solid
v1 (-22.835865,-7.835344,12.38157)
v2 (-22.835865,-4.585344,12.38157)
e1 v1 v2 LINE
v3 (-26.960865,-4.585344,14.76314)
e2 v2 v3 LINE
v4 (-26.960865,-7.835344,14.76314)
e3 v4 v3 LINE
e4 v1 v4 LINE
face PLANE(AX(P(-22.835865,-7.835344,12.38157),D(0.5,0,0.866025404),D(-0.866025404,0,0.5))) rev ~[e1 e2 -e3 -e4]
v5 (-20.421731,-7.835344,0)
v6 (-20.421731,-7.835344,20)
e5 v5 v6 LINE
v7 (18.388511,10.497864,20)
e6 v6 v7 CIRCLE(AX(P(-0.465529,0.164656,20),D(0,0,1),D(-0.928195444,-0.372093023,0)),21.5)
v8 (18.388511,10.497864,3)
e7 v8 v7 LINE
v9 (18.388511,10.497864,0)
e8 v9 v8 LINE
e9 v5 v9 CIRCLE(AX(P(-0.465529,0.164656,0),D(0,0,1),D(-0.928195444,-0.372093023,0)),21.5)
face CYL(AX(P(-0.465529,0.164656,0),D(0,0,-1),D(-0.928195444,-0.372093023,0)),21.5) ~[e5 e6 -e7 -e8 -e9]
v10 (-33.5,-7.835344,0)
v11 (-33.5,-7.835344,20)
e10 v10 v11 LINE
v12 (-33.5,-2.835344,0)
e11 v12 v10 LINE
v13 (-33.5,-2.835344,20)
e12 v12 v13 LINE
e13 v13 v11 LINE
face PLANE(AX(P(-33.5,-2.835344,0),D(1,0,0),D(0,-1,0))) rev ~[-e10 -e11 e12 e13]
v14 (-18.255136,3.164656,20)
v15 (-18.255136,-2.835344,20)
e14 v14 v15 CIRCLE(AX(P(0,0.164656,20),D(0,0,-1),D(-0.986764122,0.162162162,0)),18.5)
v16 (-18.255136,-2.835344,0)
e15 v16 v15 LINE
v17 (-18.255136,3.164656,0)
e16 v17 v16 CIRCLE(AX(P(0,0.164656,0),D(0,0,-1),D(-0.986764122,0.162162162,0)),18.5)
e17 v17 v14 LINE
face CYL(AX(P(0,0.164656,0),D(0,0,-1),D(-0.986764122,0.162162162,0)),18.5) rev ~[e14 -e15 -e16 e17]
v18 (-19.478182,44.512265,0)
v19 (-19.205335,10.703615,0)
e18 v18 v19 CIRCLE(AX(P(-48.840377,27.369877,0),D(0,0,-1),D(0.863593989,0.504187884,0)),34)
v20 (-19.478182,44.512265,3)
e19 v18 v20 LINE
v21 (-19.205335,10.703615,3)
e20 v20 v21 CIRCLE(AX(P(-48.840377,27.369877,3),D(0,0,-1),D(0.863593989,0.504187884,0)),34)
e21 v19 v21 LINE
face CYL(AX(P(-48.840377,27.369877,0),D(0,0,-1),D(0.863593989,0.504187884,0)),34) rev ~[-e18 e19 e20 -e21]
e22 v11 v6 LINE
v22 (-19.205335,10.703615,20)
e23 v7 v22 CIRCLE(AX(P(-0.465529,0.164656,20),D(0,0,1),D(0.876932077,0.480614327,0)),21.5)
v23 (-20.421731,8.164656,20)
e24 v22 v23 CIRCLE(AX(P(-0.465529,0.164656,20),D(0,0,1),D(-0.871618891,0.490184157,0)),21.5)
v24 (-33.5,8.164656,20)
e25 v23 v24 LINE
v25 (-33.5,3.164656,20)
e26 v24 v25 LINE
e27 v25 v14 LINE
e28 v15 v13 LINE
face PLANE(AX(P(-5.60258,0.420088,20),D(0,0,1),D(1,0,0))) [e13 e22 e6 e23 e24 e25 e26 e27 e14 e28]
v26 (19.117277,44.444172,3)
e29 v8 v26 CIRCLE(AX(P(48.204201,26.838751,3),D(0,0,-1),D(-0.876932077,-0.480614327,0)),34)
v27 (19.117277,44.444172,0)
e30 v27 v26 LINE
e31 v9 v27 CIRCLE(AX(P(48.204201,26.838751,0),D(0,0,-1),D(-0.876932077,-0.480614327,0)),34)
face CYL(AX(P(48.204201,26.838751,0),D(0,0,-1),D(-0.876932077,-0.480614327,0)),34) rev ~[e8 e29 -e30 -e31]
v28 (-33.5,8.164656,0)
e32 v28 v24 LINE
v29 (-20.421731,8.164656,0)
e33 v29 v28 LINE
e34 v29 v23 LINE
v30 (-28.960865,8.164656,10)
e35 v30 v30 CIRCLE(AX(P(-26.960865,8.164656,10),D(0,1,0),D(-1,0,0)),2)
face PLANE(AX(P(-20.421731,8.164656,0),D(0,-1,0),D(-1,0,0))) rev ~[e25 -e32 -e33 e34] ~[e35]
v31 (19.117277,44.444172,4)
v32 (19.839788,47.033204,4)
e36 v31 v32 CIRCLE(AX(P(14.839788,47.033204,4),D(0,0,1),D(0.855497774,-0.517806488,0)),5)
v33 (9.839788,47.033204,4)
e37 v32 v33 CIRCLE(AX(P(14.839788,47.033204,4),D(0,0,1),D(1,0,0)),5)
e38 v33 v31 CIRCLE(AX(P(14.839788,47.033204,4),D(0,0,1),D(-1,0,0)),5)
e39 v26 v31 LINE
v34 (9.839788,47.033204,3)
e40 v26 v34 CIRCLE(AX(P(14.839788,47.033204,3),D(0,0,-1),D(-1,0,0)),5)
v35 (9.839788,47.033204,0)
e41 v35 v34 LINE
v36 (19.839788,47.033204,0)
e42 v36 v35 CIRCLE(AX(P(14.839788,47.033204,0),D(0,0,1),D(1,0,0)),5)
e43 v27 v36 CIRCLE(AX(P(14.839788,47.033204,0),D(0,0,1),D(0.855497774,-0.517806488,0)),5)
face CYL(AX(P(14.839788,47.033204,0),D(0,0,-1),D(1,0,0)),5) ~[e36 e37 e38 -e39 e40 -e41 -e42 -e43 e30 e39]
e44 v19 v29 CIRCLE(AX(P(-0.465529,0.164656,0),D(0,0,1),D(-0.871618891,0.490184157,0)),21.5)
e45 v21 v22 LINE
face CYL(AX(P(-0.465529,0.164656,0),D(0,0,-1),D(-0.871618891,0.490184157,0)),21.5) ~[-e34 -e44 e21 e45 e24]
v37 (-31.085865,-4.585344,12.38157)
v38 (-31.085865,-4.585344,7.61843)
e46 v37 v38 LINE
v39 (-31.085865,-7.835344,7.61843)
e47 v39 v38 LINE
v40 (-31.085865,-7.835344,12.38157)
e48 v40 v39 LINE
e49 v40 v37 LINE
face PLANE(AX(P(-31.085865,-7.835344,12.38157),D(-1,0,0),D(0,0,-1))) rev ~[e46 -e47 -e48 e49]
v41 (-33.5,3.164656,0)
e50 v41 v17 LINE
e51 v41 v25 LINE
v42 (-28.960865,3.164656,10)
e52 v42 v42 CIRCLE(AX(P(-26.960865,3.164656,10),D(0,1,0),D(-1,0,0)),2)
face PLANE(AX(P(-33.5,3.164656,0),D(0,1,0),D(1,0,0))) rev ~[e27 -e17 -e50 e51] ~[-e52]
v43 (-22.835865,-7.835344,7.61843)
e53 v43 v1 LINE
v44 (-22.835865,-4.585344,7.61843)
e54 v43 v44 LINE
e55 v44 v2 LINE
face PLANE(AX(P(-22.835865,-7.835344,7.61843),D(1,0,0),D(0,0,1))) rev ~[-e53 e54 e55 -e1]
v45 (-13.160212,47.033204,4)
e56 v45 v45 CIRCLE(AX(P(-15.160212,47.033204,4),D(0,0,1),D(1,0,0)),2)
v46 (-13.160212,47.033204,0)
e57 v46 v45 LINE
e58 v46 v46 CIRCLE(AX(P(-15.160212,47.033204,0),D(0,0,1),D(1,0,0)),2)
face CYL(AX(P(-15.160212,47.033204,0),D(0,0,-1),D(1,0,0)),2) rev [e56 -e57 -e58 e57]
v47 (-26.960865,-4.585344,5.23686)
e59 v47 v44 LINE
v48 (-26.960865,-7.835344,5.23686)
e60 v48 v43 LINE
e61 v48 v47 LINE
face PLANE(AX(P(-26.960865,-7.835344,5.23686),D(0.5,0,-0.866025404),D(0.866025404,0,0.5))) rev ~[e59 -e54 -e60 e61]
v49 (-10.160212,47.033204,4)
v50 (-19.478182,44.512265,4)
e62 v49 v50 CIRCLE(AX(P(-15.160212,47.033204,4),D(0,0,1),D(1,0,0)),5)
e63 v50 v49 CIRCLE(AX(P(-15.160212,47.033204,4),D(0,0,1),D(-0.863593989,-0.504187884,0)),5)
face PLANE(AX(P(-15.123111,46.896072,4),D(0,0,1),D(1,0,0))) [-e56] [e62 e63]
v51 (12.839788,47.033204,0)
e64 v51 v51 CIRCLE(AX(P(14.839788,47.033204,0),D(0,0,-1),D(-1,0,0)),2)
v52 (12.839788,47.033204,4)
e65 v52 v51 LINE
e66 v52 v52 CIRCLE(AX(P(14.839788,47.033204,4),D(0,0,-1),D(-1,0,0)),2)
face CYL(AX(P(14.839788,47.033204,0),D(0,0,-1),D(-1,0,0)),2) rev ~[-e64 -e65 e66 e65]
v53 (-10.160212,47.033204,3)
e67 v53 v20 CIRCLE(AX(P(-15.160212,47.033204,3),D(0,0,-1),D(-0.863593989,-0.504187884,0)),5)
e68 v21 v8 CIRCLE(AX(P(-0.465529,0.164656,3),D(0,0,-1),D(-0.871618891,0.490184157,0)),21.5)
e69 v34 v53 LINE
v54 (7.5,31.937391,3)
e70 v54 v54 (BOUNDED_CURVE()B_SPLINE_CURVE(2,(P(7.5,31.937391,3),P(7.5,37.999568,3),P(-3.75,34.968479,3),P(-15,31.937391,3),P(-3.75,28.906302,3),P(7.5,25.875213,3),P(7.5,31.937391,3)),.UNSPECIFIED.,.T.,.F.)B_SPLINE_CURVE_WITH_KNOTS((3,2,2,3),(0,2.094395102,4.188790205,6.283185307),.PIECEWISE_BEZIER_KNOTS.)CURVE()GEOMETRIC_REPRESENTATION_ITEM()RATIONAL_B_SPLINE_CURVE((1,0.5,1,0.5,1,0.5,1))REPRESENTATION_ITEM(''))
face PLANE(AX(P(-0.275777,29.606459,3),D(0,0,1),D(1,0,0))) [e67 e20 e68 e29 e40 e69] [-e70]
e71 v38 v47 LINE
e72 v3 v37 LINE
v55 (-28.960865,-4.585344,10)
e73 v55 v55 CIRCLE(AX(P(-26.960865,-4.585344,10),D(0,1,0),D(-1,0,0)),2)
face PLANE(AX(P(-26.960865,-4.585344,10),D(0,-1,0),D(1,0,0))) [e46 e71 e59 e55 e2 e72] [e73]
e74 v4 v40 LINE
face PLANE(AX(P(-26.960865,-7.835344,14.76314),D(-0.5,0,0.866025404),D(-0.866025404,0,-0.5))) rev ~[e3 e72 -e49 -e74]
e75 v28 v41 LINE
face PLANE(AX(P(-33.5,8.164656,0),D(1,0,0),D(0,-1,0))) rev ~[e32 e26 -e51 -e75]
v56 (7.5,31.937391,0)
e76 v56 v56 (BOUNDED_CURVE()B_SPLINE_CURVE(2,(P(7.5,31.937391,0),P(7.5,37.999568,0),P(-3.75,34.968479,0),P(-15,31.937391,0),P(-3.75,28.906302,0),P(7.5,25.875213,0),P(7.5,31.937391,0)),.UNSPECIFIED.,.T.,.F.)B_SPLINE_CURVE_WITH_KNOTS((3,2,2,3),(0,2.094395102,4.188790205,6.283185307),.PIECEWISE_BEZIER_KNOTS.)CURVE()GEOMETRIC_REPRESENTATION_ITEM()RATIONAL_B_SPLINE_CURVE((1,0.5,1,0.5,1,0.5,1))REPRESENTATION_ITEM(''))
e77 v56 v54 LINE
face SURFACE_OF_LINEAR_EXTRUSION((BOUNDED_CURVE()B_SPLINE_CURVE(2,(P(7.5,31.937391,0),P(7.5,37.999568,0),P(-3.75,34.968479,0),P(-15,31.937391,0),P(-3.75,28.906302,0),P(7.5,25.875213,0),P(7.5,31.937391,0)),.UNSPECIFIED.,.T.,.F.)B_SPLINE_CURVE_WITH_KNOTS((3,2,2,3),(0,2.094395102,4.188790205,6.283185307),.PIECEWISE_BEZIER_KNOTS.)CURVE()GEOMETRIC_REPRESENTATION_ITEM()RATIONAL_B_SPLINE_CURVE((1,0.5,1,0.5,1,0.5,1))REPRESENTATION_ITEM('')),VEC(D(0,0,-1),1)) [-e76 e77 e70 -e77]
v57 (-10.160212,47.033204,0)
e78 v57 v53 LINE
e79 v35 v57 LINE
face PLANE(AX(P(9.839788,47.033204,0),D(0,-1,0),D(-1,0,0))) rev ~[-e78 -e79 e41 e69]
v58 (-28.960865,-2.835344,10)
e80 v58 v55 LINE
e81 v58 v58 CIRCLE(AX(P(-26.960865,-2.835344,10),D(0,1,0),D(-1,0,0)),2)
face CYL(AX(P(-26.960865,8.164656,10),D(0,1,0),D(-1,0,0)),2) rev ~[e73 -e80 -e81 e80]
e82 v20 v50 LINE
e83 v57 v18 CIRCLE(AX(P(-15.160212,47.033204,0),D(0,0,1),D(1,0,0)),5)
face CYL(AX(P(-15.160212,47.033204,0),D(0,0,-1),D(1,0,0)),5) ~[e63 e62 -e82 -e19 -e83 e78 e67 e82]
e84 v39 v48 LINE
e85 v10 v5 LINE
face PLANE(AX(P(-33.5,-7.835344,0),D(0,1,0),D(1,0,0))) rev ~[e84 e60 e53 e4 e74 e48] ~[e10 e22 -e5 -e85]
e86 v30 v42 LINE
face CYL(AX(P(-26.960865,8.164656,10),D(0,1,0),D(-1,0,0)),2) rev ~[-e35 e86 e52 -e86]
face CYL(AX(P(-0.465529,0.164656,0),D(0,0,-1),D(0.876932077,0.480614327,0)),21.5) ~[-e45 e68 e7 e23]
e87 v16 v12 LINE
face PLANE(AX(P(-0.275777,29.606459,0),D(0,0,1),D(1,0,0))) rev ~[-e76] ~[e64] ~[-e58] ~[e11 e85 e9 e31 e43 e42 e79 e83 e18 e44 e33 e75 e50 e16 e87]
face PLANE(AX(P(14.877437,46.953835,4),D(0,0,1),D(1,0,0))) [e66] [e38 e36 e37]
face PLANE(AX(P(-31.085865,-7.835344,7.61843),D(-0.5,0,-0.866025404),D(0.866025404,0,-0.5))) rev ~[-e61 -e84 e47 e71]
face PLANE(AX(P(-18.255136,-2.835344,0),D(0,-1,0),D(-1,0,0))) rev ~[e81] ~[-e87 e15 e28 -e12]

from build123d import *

# Parameters (mm, degrees)
F1_DEPTH = 20
F0_R     = 2
F2_DEPTH = 3
F3_DEPTH = 4
F5_DEPTH = 3.25
F6_R     = 2
F7_DEPTH = 29.5010001


# Not quite as in the source:
# - a feature names something its author has since deleted; it is built from what else it names


with BuildPart() as f1:
    # F0 (on Top) → F1 (new body)
    with BuildSketch(Plane.XY):
        with BuildLine():
            ThreePointArc((-18.2551362635, 3.1646558729), (18.5, 0.1646558729), (-18.2551362635, -2.8353441271))
            Line((-18.2551362635, -2.8353441271), (-21.289668856, -2.8353441271))
            Line((-21.289668856, -2.8353441271), (-33.5, -2.8353441271))
            Line((-33.5, -2.8353441271), (-33.5, -5.8353441271))
            Line((-33.5, -5.8353441271), (-33.5, -7.8353441271))
            Line((-33.5, -7.8353441271), (-20.4217309456, -7.8353441271))
            ThreePointArc((-20.4217309456, -7.8353441271), (8.7176252261, -19.2755005117), (18.3885107603, 10.4978639134))
            ThreePointArc((18.3885107603, 10.4978639134), (-0.3478610365, 21.6643338769), (-19.2053350681, 10.7036152553))
            ThreePointArc((-19.2053350681, 10.7036152553), (-19.8551354356, 9.4540669672), (-20.4217309456, 8.1646558729))
            Line((-20.4217309456, 8.1646558729), (-33.5, 8.1646558729))
            Line((-33.5, 8.1646558729), (-33.5, 6.1646558729))
            Line((-33.5, 6.1646558729), (-33.5, 3.1646558729))
            Line((-33.5, 3.1646558729), (-21.289668856, 3.1646558729))
            Line((-21.289668856, 3.1646558729), (-18.2551362635, 3.1646558729))
        make_face()
    extrude(amount=F1_DEPTH)

    # F0 (on Top) → F2 (join)
    with BuildSketch(Plane.XY):
        with BuildLine():
            ThreePointArc((-19.2053350681, 10.7036152553), (-0.3478610365, 21.6643338769), (18.3885107603, 10.4978639134))
            ThreePointArc((18.3885107603, 10.4978639134), (14.2120337074, 27.5685018888), (19.1172770705, 44.4441716239))
            ThreePointArc((19.1172770705, 44.4441716239), (13.4958098431, 42.2172179553), (9.8397882001, 47.0332040616))
            Line((9.8397882001, 47.0332040616), (-10.1602117999, 47.0332040616))
            ThreePointArc((-10.1602117999, 47.0332040616), (-13.8544265436, 42.2067224379), (-19.4781817457, 44.512264644))
            ThreePointArc((-19.4781817457, 44.512264644), (-14.8414845345, 27.6442586076), (-19.2053350681, 10.7036152553))
        make_face()
        with BuildLine():
            add(Edge.make_bspline(
                [(7.5, 31.9373905659), (7.5, 37.9995683924), (-3.75, 34.9684794791), (-15, 31.9373905659), (-3.75, 28.9063016526), (7.5, 25.8752127394), (7.5, 31.9373905659)],
                knots=[0, 0, 0, 2.0943951024, 2.0943951024, 4.1887902048, 4.1887902048, 6.2831853072, 6.2831853072, 6.2831853072], degree=2, weights=[1, 0.5, 1, 0.5, 1, 0.5, 1]))
        make_face(mode=Mode.SUBTRACT)
        with BuildLine():
            ThreePointArc((-10.1602117999, 47.0332040616), (-16.4659970562, 51.8596856854), (-19.4781817457, 44.512264644))
            ThreePointArc((-19.4781817457, 44.512264644), (-13.8544265436, 42.2067224379), (-10.1602117999, 47.0332040616))
        make_face()
        with Locations((-15.1602117999, 47.0332040616)):
            Circle(F0_R, mode=Mode.SUBTRACT)
        with BuildLine():
            ThreePointArc((9.8397882001, 47.0332040616), (13.4958098431, 42.2172179553), (19.1172770705, 44.4441716239))
            ThreePointArc((19.1172770705, 44.4441716239), (19.6557743064, 45.6892257046), (19.8397882001, 47.0332040616))
            ThreePointArc((19.8397882001, 47.0332040616), (14.8397882001, 52.0332040616), (9.8397882001, 47.0332040616))
        make_face()
        with BuildLine():
            ThreePointArc((16.8397882001, 47.0332040616), (14.8397882001, 45.0332040616), (12.8397882001, 47.0332040616))
            ThreePointArc((12.8397882001, 47.0332040616), (14.8397882001, 49.0332040616), (16.8397882001, 47.0332040616))
        make_face(mode=Mode.SUBTRACT)
    extrude(amount=F2_DEPTH)

    # F0 (on Top) → F3 (join)
    with BuildSketch(Plane.XY):
        with BuildLine():
            ThreePointArc((-10.1602117999, 47.0332040616), (-16.4659970562, 51.8596856854), (-19.4781817457, 44.512264644))
            ThreePointArc((-19.4781817457, 44.512264644), (-13.8544265436, 42.2067224379), (-10.1602117999, 47.0332040616))
        make_face()
        with Locations((-15.1602117999, 47.0332040616)):
            Circle(F0_R, mode=Mode.SUBTRACT)
        with BuildLine():
            ThreePointArc((9.8397882001, 47.0332040616), (13.4958098431, 42.2172179553), (19.1172770705, 44.4441716239))
            ThreePointArc((19.1172770705, 44.4441716239), (19.6557743064, 45.6892257046), (19.8397882001, 47.0332040616))
            ThreePointArc((19.8397882001, 47.0332040616), (14.8397882001, 52.0332040616), (9.8397882001, 47.0332040616))
        make_face()
        with BuildLine():
            ThreePointArc((16.8397882001, 47.0332040616), (14.8397882001, 45.0332040616), (12.8397882001, 47.0332040616))
            ThreePointArc((12.8397882001, 47.0332040616), (14.8397882001, 49.0332040616), (16.8397882001, 47.0332040616))
        make_face(mode=Mode.SUBTRACT)
    extrude(amount=F3_DEPTH)

    # F4 (on face) → F5 (cut)
    with BuildSketch(Plane.XZ.offset(7.8353441271)):
        Polygon((-31.0858654728, 12.3815698604), (-31.0858654728, 7.6184301396), (-26.9608654728, 5.2368602792), (-22.8358654728, 7.6184301396), (-22.8358654728, 12.3815698604), (-26.9608654728, 14.7631397208), align=None)
    extrude(amount=-F5_DEPTH, mode=Mode.SUBTRACT)

    # F6 (on face) → F7 (cut, through all)
    with BuildSketch(Plane(origin=(0, 8.1646558729, 0), x_dir=(-1, 0, 0), z_dir=(0, 1, 0))):
        with Locations((26.9608654728, 10)):
            Circle(F6_R)
    extrude(amount=-F7_DEPTH, mode=Mode.SUBTRACT)


solid = f1.part
